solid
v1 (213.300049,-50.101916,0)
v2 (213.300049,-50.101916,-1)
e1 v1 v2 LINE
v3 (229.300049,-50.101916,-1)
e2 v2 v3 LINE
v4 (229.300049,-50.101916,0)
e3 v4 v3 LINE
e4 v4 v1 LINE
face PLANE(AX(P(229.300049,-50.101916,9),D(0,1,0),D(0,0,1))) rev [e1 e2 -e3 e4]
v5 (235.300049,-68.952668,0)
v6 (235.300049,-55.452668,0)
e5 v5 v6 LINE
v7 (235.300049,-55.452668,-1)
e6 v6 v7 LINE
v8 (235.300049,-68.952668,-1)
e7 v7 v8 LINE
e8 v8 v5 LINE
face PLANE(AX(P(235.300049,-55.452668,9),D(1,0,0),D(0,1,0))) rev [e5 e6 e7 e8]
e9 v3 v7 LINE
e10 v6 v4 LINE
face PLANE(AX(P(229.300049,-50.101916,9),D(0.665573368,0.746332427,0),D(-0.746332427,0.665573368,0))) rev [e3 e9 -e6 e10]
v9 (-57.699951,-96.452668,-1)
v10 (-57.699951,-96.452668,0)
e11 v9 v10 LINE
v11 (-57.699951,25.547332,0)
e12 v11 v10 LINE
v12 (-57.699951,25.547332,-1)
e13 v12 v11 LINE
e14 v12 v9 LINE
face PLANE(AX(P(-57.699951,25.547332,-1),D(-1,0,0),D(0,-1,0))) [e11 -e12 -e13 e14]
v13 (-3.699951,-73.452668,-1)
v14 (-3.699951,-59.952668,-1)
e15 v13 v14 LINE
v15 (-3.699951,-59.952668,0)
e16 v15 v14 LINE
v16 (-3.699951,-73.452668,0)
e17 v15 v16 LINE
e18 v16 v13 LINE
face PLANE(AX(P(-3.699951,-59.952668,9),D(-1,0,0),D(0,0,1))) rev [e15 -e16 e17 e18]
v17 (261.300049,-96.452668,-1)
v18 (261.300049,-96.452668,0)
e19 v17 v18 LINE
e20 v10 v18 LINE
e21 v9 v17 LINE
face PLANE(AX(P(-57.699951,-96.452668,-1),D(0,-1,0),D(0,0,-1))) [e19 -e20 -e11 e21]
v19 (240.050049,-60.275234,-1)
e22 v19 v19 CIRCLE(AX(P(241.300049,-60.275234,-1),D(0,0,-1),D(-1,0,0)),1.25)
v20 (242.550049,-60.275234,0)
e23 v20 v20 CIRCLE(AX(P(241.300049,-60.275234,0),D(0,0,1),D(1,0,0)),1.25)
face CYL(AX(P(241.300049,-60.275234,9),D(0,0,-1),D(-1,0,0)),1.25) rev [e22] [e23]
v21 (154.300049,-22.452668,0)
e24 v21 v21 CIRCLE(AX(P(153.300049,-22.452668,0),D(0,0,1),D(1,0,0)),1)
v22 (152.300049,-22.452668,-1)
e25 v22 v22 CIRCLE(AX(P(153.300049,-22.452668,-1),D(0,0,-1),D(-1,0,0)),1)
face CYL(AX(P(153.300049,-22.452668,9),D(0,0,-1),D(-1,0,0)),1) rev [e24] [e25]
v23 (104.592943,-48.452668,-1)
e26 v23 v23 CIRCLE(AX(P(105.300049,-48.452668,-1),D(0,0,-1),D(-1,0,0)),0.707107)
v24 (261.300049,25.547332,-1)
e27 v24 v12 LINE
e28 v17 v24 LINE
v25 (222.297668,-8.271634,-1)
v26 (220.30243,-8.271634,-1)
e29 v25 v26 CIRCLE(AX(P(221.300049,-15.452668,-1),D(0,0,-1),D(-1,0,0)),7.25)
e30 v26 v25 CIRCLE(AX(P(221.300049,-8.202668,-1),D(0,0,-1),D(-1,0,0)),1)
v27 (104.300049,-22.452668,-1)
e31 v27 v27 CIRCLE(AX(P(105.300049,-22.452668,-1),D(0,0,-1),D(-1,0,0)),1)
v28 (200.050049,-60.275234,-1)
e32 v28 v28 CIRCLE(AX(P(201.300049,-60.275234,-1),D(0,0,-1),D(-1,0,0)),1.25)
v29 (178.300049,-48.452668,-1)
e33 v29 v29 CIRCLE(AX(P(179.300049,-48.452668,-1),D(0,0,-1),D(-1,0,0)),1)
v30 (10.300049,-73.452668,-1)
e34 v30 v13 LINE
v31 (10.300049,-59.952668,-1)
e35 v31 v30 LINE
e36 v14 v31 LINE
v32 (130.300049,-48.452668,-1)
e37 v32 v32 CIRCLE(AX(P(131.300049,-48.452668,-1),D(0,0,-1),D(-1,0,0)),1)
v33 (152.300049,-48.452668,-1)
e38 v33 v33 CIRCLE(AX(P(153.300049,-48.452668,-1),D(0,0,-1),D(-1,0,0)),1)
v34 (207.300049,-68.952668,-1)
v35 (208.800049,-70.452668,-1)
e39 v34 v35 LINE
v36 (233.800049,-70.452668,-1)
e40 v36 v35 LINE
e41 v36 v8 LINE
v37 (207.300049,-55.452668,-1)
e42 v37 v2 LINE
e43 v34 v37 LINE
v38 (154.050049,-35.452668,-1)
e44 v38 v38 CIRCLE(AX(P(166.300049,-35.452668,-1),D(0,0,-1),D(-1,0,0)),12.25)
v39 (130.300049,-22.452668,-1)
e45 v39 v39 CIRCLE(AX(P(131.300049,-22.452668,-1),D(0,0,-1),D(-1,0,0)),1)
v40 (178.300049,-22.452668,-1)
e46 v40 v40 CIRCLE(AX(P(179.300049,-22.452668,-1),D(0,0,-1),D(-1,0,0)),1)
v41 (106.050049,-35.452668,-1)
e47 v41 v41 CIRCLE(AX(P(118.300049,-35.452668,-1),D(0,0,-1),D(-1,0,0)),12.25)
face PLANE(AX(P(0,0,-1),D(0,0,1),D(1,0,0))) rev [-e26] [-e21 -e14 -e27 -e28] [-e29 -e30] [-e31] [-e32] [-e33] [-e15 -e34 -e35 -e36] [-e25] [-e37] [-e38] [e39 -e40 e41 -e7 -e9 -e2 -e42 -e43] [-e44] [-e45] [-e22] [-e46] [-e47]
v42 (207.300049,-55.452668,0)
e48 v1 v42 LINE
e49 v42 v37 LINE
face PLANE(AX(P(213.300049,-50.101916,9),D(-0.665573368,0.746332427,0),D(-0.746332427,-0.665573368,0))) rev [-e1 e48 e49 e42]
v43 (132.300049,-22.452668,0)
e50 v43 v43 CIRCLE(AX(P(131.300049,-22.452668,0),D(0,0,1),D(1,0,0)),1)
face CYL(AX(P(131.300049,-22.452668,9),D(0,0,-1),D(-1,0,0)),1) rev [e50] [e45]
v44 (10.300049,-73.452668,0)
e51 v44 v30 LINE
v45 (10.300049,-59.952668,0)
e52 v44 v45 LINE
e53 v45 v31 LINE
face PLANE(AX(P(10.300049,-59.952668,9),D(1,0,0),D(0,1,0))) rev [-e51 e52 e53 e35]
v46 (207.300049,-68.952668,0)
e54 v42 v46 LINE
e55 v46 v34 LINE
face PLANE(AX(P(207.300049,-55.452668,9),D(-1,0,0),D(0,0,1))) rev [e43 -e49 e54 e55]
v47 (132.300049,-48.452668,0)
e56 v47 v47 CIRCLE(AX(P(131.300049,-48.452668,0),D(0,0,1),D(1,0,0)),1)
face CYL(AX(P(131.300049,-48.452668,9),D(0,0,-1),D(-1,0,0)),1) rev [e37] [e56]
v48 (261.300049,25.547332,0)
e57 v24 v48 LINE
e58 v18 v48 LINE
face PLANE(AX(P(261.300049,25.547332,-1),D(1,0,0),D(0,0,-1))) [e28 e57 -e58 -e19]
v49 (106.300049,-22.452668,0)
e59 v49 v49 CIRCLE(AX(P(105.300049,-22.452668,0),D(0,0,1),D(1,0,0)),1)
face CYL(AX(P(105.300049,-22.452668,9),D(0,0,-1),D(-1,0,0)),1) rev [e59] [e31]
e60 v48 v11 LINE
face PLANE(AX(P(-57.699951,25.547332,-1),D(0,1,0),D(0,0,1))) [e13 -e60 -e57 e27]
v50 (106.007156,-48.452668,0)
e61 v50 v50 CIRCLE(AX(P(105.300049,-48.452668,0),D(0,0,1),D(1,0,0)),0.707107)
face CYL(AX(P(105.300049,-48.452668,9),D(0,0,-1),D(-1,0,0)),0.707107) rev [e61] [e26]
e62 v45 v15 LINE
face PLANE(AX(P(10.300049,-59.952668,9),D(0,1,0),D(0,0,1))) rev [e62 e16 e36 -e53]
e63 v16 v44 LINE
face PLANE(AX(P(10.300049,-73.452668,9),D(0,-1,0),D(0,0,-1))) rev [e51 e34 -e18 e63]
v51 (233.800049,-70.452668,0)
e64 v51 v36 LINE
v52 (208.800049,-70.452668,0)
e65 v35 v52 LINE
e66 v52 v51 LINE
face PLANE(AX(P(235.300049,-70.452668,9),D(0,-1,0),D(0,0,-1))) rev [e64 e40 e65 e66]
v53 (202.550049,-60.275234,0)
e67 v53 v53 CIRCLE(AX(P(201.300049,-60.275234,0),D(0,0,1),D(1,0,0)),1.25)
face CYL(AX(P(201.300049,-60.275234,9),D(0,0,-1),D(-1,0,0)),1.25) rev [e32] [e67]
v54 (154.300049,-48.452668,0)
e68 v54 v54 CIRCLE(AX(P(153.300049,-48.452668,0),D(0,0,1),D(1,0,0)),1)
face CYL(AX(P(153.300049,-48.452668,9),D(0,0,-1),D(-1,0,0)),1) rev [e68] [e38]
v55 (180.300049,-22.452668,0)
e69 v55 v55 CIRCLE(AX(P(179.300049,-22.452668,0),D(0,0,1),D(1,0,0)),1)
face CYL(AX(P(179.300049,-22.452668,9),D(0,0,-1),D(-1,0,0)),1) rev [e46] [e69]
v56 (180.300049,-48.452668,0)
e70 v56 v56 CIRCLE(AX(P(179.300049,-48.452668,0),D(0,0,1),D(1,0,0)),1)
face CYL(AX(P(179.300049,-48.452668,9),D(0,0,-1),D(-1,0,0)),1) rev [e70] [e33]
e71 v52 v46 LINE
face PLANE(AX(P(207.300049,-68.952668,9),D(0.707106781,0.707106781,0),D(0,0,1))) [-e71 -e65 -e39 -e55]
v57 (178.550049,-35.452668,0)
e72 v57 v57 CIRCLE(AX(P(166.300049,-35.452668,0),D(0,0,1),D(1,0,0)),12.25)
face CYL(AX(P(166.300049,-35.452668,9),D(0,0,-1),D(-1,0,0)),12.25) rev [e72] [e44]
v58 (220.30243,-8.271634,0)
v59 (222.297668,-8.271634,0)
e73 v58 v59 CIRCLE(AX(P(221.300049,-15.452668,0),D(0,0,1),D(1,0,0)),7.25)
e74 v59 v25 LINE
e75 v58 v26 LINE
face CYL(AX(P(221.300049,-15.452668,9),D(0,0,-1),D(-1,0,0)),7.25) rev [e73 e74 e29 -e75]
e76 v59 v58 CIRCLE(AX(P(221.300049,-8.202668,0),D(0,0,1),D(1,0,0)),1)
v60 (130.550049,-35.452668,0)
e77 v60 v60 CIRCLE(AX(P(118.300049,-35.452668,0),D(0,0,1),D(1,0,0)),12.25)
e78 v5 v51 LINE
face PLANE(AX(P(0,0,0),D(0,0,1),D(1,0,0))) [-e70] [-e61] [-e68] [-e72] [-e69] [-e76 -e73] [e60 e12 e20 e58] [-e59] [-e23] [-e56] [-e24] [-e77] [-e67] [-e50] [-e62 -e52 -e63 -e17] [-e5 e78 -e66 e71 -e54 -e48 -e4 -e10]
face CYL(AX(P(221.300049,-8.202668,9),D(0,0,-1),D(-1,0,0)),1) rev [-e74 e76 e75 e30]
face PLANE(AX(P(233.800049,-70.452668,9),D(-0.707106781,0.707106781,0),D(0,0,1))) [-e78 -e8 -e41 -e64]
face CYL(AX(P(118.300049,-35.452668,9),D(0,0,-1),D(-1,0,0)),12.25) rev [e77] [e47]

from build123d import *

# Parameters (mm, degrees)
SKETCH_1_W             = 319
SKETCH_1_H             = 122
SM_BASE_FLANGE_1_DEPTH = 1
SKETCH_2_R             = 12.25
CUT_EXTRUDE_1_DEPTH    = 10
SKETCH_3_R             = 1
SKETCH_3_R_2           = 0.707106781
CUT_EXTRUDE_2_DEPTH    = 10
CUT_EXTRUDE_3_DEPTH    = 10
SKETCH_5_R             = 1.25
CUT_EXTRUDE_4_DEPTH    = 10
CHAMFER_1_SIZE         = 1.5
SKETCH_6_W             = 14
SKETCH_6_H             = 13.5
CUT_EXTRUDE_5_DEPTH    = 10


# Sheet-metal steps are written as plain solids
with BuildPart() as part:
    # Sketch 1 → Базовая кромка1 (new body)
    with BuildSketch(Plane.XY):
        with Locations((101.800049421, -35.452668213)):
            Rectangle(SKETCH_1_W, SKETCH_1_H)
    extrude(amount=-SM_BASE_FLANGE_1_DEPTH)

    # Эскиз2 → Вырез-Вытянуть1 (cut)
    with BuildSketch(Plane(origin=(0, 0, -1), x_dir=(-1, 0, 0), z_dir=(0, 0, -1))):
        with Locations((-166.300049421, -35.452668213)):
            Circle(SKETCH_2_R)
        with Locations((-118.300049421, -35.452668213)):
            Circle(SKETCH_2_R)
        with BuildLine():
            ThreePointArc((-222.297668465, -8.271633731), (-221.300049421, -22.702668213), (-220.302430377, -8.271633731))
            ThreePointArc((-220.302430377, -8.271633731), (-221.300049421, -7.202668213), (-222.297668465, -8.271633731))
        make_face()
    extrude(amount=-CUT_EXTRUDE_1_DEPTH, mode=Mode.SUBTRACT)

    # Эскиз3 → Вырез-Вытянуть2 (cut)
    with BuildSketch(Plane(origin=(0, 0, -1), x_dir=(-1, 0, 0), z_dir=(0, 0, -1))):
        with Locations((-179.300049421, -22.452668213)):
            Circle(SKETCH_3_R)
        with Locations((-153.300049421, -22.452668213)):
            Circle(SKETCH_3_R)
        with Locations((-179.300049421, -48.452668213)):
            Circle(SKETCH_3_R)
        with Locations((-153.300049421, -48.452668213)):
            Circle(SKETCH_3_R)
        with Locations((-131.300049421, -48.452668213)):
            Circle(SKETCH_3_R)
        with Locations((-105.300049421, -48.452668213)):
            Circle(SKETCH_3_R_2)
        with Locations((-131.300049421, -22.452668213)):
            Circle(SKETCH_3_R)
        with Locations((-105.300049421, -22.452668213)):
            Circle(SKETCH_3_R)
    extrude(amount=-CUT_EXTRUDE_2_DEPTH, mode=Mode.SUBTRACT)

    # Эскиз4 → Вырез-Вытянуть3 (cut)
    with BuildSketch(Plane(origin=(0, 0, -1), x_dir=(-1, 0, 0), z_dir=(0, 0, -1))):
        Polygon((-213.300049421, -50.101915565), (-207.300049421, -55.452668213), (-207.300049421, -70.452668213), (-235.300049421, -70.452668213), (-235.300049421, -55.452668213), (-229.300049421, -50.101915565), align=None)
    extrude(amount=-CUT_EXTRUDE_3_DEPTH, mode=Mode.SUBTRACT)

    # Эскиз5 → Вырез-Вытянуть4 (cut)
    with BuildSketch(Plane(origin=(0, 0, -1), x_dir=(-1, 0, 0), z_dir=(0, 0, -1))):
        with Locations((-241.300049425, -60.275234132)):
            Circle(SKETCH_5_R)
        with Locations((-201.300049425, -60.275234132)):
            Circle(SKETCH_5_R)
    extrude(amount=-CUT_EXTRUDE_4_DEPTH, mode=Mode.SUBTRACT)

    # Фаска1
    chamfer_1_edges = [part.edges().sort_by_distance(p)[0] for p in [
        (207.300049421, -70.452668213, -0.5),
        (235.300049421, -70.452668213, -0.5),
    ]]
    chamfer(chamfer_1_edges, length=CHAMFER_1_SIZE)

    # Эскиз6 → Вырез-Вытянуть5 (cut)
    with BuildSketch(Plane(origin=(0, 0, -1), x_dir=(-1, 0, 0), z_dir=(0, 0, -1))):
        with Locations((-3.300049421, -66.702668213)):
            Rectangle(SKETCH_6_W, SKETCH_6_H)
    extrude(amount=-CUT_EXTRUDE_5_DEPTH, mode=Mode.SUBTRACT)


solid = part.part
